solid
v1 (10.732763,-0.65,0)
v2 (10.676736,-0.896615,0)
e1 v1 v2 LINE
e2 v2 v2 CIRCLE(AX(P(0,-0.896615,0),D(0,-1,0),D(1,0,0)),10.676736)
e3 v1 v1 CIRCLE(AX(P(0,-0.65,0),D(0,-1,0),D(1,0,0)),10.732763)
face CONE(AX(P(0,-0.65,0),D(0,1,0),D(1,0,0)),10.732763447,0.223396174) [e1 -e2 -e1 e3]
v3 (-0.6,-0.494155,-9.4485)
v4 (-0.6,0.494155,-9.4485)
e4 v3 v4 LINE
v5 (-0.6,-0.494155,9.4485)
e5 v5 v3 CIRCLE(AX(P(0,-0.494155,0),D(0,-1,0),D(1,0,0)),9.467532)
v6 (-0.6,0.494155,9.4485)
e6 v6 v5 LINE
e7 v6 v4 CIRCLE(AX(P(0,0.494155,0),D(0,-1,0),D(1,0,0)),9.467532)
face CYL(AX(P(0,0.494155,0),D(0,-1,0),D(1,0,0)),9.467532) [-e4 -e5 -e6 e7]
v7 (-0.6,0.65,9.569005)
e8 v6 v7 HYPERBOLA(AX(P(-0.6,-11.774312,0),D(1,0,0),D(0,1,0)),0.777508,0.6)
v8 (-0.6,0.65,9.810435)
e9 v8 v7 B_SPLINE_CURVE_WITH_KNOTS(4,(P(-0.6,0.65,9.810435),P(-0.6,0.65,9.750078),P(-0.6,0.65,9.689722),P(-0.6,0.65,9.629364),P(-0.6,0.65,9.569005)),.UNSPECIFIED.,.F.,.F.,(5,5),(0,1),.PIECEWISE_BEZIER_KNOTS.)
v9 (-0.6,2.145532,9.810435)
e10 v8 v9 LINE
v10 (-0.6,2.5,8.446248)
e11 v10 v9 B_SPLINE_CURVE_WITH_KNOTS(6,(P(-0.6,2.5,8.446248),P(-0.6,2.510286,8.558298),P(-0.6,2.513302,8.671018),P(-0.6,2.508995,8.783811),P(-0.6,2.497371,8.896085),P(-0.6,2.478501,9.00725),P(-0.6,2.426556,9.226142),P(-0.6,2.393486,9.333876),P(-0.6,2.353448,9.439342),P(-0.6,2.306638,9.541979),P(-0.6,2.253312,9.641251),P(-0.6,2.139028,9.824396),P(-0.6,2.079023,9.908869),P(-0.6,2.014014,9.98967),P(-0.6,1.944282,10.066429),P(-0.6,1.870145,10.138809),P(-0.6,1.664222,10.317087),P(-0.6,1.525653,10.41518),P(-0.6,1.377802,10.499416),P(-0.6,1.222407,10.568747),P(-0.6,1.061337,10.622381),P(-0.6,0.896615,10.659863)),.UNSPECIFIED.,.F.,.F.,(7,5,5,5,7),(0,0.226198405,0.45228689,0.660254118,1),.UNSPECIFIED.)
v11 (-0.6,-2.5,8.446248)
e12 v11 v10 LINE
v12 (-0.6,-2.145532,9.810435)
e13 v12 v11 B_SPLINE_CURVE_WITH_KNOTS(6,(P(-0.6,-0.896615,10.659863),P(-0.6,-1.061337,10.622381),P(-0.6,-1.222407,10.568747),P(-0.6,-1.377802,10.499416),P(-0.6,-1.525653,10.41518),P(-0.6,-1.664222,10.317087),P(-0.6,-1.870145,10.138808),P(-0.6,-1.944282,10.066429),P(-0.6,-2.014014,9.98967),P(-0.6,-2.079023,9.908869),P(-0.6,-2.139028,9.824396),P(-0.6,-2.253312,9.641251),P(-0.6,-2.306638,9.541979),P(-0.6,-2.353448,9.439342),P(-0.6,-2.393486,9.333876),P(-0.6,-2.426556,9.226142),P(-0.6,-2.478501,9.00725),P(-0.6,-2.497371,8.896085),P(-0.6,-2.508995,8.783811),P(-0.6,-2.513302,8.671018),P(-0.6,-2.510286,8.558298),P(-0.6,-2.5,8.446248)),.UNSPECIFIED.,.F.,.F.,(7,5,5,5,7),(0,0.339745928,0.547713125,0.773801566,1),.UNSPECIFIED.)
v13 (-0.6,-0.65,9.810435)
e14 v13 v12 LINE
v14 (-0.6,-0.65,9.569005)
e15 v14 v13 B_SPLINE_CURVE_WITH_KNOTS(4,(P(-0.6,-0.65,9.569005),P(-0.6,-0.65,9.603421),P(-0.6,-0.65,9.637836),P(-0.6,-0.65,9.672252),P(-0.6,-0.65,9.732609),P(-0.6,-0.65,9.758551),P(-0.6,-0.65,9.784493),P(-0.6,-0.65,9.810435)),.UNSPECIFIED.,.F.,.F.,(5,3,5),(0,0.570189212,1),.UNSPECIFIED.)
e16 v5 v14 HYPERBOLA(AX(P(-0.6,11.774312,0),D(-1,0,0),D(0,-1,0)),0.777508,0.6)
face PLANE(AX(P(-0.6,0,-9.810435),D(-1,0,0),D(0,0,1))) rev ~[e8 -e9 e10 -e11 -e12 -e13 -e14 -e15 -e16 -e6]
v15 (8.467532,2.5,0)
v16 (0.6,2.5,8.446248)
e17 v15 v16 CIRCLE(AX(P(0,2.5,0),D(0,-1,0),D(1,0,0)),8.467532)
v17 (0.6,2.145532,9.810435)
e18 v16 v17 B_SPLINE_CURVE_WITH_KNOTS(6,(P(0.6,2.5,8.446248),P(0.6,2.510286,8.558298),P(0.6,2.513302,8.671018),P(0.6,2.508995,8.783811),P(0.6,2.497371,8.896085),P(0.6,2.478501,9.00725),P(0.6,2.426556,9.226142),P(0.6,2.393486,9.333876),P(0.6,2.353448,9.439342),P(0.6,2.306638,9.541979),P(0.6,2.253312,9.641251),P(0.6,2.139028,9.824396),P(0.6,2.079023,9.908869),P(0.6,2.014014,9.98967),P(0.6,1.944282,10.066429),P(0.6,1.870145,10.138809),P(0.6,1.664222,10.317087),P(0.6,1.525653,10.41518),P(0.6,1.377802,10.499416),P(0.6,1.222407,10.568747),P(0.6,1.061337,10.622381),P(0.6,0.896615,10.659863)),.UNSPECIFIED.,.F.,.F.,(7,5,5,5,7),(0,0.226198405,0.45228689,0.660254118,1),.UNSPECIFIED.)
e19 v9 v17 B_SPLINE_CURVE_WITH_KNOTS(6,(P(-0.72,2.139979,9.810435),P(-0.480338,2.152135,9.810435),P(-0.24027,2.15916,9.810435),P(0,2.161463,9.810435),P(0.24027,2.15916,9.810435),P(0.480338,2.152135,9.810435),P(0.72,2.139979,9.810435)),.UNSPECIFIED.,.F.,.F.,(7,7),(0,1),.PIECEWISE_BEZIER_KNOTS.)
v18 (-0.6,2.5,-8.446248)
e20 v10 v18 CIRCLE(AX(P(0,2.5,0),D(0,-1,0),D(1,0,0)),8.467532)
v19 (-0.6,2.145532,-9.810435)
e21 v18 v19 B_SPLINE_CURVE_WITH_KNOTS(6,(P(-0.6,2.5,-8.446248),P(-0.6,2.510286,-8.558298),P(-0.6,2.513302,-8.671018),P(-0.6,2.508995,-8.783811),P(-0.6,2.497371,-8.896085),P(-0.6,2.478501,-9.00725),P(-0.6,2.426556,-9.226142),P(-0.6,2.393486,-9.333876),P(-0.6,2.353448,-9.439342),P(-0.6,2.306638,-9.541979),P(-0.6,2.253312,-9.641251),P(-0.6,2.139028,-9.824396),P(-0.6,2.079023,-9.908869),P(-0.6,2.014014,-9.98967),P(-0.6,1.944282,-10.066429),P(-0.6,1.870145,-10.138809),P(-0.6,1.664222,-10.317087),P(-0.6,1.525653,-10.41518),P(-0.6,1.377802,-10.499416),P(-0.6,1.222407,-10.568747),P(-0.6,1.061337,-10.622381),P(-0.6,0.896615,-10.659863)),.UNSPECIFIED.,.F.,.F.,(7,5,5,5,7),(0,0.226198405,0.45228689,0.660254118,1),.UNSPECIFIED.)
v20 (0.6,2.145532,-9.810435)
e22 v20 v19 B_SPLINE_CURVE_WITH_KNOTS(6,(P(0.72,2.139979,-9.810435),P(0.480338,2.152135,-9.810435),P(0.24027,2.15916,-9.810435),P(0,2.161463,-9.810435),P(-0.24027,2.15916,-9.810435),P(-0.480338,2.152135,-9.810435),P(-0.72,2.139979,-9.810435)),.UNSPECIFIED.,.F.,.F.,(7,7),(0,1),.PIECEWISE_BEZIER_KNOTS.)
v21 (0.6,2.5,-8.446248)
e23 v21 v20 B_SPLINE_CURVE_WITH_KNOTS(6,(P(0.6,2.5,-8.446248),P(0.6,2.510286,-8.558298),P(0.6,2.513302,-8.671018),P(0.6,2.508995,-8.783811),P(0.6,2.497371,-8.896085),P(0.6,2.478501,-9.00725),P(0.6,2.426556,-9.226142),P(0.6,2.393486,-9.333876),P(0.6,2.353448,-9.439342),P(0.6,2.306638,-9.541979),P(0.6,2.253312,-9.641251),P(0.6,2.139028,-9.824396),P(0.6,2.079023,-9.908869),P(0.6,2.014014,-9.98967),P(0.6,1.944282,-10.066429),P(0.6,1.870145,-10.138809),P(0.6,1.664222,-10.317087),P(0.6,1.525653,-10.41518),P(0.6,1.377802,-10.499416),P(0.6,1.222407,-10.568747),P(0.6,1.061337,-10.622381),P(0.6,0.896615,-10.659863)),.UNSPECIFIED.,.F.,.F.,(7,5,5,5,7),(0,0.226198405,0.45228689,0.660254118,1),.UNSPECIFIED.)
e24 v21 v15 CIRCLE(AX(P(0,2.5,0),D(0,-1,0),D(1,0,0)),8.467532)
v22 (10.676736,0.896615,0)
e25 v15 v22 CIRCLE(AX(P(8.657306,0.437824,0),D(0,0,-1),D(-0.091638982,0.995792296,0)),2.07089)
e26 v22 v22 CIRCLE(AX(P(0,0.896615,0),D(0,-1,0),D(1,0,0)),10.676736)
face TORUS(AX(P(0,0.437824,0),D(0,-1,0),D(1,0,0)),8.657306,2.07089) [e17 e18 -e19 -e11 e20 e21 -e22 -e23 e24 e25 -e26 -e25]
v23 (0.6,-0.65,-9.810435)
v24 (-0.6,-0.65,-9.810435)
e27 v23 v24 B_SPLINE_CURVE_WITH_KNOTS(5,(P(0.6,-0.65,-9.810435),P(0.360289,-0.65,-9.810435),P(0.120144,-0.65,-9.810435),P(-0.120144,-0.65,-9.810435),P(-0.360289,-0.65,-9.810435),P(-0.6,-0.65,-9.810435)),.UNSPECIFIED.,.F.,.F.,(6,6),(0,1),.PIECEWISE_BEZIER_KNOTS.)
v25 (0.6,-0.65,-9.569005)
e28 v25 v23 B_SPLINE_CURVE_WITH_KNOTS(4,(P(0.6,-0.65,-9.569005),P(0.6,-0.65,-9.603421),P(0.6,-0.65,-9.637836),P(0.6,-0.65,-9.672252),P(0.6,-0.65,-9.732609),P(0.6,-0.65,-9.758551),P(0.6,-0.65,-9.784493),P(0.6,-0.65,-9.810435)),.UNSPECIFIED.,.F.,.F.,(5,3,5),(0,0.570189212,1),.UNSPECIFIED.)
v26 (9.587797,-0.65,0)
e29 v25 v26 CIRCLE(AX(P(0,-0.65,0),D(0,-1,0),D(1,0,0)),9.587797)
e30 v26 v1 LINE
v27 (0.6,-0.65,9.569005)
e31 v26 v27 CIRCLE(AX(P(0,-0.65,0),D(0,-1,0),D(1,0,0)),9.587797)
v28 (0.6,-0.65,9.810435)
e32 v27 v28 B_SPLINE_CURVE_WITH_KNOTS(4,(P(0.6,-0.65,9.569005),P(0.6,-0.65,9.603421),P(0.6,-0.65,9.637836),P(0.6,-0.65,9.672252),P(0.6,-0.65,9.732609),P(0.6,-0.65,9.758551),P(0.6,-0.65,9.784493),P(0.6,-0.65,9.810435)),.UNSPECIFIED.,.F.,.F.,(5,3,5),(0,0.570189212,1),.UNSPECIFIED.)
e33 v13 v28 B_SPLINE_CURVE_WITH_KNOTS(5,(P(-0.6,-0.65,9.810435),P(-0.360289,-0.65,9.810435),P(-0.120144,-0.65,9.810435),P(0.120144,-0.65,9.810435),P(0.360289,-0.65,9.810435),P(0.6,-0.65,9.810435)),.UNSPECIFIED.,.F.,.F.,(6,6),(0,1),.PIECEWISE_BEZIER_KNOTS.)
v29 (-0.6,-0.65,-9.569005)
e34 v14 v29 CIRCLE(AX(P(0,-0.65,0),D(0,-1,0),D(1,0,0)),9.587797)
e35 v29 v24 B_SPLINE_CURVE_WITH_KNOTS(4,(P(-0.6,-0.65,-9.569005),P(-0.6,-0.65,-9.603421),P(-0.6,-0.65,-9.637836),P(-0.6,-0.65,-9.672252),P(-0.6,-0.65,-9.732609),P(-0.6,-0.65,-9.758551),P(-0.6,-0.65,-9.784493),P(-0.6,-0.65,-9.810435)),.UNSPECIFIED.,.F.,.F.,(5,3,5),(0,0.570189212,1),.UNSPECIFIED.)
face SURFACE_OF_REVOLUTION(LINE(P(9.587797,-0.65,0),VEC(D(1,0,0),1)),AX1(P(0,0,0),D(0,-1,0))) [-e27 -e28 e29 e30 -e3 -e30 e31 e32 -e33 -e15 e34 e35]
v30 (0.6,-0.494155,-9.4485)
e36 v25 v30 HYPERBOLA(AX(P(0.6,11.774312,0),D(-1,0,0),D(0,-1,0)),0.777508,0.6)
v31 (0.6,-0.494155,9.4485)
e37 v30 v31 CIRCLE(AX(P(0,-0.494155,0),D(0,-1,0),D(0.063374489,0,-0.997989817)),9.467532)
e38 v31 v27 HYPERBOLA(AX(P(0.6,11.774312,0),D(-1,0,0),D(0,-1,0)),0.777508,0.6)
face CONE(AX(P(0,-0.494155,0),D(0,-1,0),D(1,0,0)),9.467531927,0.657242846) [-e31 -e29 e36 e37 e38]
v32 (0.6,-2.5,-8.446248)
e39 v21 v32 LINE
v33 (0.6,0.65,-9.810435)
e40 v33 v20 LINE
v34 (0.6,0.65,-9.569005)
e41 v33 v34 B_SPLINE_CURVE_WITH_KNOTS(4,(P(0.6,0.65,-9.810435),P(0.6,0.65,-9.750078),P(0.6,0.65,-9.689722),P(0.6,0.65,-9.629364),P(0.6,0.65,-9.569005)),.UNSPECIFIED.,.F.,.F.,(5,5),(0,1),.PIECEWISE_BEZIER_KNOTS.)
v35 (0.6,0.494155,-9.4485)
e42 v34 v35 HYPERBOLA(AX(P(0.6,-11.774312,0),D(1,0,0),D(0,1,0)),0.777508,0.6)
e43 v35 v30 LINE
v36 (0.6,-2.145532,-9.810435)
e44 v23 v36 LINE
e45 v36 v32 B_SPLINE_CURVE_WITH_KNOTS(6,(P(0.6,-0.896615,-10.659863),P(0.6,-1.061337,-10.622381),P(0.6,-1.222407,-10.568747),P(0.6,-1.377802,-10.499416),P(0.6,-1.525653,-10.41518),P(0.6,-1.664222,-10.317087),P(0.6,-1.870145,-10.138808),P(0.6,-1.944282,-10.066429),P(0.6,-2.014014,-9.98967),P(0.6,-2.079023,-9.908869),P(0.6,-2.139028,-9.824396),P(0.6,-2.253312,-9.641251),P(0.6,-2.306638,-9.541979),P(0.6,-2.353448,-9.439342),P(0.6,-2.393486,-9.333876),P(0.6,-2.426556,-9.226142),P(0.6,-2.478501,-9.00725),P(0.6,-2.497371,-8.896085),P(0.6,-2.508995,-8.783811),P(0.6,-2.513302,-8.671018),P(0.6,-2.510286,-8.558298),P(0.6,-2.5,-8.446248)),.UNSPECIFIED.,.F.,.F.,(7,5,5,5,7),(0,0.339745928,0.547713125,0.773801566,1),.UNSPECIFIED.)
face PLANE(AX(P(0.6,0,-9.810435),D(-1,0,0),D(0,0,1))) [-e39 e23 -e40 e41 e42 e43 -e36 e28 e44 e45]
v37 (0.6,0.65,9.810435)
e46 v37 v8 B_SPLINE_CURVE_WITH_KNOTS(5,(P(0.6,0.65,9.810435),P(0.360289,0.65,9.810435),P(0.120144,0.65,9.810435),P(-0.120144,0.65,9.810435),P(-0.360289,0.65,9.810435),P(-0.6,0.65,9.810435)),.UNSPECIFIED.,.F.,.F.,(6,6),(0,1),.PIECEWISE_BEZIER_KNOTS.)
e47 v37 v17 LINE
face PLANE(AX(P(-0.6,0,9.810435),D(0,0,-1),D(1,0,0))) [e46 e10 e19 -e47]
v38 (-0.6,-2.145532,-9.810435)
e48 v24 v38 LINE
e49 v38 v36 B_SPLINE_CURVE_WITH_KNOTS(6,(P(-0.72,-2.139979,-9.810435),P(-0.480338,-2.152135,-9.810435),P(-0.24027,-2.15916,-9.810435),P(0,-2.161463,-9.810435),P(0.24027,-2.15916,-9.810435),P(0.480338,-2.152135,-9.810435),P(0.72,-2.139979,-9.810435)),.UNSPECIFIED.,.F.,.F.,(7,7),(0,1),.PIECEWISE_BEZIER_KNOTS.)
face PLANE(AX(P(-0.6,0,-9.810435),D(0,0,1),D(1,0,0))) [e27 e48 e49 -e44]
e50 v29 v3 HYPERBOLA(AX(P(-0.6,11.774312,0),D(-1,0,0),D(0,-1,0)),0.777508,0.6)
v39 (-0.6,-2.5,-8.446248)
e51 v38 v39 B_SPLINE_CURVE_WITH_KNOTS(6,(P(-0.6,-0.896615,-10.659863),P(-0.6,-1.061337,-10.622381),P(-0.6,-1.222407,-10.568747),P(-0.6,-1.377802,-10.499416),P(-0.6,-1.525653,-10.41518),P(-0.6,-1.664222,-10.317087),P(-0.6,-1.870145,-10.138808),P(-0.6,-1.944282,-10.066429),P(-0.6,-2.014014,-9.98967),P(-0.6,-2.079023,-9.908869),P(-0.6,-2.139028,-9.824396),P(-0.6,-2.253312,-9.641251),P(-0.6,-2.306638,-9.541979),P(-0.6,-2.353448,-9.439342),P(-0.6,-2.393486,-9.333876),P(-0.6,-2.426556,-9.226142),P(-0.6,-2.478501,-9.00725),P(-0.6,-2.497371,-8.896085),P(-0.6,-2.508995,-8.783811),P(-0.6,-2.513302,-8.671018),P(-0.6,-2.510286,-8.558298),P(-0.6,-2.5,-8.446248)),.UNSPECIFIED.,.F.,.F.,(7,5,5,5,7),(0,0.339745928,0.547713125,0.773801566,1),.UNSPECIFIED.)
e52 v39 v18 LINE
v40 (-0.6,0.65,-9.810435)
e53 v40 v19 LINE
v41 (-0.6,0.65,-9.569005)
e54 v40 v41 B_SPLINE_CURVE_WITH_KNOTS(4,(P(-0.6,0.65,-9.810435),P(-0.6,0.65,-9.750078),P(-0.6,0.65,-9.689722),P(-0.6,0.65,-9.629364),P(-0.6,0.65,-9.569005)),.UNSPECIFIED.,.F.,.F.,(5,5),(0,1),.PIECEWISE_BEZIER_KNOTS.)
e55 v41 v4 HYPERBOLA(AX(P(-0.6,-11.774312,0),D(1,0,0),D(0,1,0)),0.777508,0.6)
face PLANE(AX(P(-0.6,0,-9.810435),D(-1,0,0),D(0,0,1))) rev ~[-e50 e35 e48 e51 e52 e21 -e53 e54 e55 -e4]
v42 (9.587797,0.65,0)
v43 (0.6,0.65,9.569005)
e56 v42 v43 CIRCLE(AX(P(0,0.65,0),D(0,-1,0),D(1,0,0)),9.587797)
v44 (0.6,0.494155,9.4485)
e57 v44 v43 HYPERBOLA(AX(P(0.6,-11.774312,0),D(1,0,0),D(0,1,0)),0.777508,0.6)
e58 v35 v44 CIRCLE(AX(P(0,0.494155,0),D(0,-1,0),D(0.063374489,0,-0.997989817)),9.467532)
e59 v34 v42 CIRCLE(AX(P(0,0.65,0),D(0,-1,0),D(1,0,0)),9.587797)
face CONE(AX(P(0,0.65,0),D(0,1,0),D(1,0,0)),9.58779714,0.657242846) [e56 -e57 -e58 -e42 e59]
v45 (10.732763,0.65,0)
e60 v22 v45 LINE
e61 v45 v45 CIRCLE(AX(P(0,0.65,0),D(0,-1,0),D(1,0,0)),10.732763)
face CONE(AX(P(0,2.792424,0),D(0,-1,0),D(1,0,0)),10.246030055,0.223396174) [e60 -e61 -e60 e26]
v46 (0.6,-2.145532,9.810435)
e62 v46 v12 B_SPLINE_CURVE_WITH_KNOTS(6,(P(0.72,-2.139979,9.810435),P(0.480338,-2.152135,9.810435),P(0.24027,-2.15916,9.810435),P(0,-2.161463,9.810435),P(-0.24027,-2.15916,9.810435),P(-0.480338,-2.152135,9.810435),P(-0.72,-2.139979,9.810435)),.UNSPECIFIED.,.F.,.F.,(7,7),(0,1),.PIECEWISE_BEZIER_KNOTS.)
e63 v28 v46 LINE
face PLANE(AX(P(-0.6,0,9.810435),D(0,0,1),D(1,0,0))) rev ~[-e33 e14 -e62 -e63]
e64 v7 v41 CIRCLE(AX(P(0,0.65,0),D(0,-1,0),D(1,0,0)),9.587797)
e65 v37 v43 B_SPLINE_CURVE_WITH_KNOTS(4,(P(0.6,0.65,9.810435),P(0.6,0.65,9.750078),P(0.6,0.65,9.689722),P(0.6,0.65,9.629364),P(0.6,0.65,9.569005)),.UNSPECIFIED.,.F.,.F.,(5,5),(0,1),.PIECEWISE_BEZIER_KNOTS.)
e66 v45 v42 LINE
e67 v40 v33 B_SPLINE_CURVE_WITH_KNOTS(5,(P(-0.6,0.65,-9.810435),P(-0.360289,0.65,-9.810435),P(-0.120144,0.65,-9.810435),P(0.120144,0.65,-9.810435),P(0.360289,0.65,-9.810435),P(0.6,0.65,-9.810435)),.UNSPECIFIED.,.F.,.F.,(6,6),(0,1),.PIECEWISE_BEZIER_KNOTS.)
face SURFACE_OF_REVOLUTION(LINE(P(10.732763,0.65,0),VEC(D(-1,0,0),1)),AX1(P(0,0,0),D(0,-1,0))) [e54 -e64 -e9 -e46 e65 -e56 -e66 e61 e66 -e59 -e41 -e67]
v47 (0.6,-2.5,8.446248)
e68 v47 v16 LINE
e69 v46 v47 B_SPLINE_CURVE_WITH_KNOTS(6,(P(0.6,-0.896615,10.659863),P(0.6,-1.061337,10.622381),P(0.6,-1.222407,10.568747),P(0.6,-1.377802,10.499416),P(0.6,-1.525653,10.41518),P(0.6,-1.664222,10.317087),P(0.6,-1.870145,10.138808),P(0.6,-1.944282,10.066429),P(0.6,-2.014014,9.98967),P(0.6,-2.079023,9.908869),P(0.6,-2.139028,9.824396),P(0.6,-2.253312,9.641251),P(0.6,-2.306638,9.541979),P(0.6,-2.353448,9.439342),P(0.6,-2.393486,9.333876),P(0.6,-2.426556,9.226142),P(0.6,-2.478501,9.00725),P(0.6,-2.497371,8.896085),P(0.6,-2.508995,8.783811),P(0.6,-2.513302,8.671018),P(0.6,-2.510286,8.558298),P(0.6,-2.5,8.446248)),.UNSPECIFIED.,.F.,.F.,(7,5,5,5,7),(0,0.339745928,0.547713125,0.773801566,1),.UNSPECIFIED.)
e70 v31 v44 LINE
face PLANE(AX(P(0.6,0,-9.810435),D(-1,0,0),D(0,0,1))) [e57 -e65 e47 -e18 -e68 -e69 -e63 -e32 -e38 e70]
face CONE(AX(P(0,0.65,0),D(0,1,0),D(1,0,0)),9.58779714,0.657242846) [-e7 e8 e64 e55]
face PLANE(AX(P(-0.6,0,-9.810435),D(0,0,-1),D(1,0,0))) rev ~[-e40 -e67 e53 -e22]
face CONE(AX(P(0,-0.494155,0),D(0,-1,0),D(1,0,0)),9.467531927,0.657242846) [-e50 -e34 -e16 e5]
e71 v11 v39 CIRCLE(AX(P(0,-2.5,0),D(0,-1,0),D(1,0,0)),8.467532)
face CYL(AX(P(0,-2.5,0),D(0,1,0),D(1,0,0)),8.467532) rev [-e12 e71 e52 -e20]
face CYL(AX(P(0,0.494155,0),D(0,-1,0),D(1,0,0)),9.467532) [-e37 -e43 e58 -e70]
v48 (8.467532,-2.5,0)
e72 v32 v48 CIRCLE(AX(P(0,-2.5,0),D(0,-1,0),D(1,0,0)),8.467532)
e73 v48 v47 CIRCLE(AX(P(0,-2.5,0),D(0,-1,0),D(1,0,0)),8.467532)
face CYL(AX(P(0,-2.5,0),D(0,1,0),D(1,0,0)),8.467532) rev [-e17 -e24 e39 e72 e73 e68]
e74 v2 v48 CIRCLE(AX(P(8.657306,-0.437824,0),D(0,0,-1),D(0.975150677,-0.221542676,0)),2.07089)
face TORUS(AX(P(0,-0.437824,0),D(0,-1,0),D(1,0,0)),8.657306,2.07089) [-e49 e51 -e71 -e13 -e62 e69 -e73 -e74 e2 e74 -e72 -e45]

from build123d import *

# Parameters (mm, degrees)
F4_W          = 1.2
F4_H          = 19.620869044
F5_DEPTH      = 25
F5_DEPTH_BACK = 25


# Not quite as in the source:
# - a fillet or chamfer that OpenCascade refuses, or shapes differently, is made with other operations: its cross-section is extruded or revolved along the edge and cut away or added


with BuildPart() as f2:
    # F2: sweep along a path in F0
    with BuildLine(Plane.XZ) as f2_path:
        CenterArc((0, 0), 8.875, 0, 360)
    # F1 (on Right) → F2 (sweep)
    with BuildSketch(Plane.YZ):
        Polygon((-2.5, 8.4675319269), (0, 8.4675319269), (2.5, 8.4675319269), (2.7924242295, 10.246030055), (0.65, 10.7327634469), (0.65, 9.5877971399), (0.494154765, 9.4675319269), (0, 9.4675319269), (-0.494154765, 9.4675319269), (-0.65, 9.5877971399), (-0.65, 10.7327634469), (-2.7924242295, 10.246030055), align=None)
    sweep(path=f2_path.line)

    # F3: fillet of radius 2.0708896165 on 2 edges, made by hand

    # F3_s1 → F3_t2 (revolve, cut)
    with BuildSketch(Plane.XY):
        with BuildLine():
            ThreePointArc((10.6767355553, -0.8966145009), (9.8737027886, -2.1138201975), (8.4675319269, -2.5))
            Line((8.4675319269, -2.5), (10.246030055, -2.7924242295))
            Line((10.246030055, -2.7924242295), (10.6767355553, -0.8966145009))
        make_face()
    revolve(axis=Axis((0, -2.7924242295, 0), (0, -1, 0)), mode=Mode.SUBTRACT)

    # F3_s3 → F3_t4 (revolve, cut)
    with BuildSketch(Plane.XY):
        with BuildLine():
            ThreePointArc((8.4675319269, 2.5), (9.8737027886, 2.1138201975), (10.6767355553, 0.8966145009))
            Line((10.6767355553, 0.8966145009), (10.246030055, 2.7924242295))
            Line((10.246030055, 2.7924242295), (8.4675319269, 2.5))
        make_face()
    revolve(axis=Axis((0, 2.7924242295, 0), (0, -1, 0)), mode=Mode.SUBTRACT)

    # F4 (on Front) → F5 (cut, two sides)
    with BuildSketch(Plane.XZ) as f5_sk:
        Rectangle(F4_W, F4_H)
    extrude(amount=-F5_DEPTH, mode=Mode.SUBTRACT)
    extrude(f5_sk.sketch, amount=F5_DEPTH_BACK, mode=Mode.SUBTRACT)


solid = f2.part
